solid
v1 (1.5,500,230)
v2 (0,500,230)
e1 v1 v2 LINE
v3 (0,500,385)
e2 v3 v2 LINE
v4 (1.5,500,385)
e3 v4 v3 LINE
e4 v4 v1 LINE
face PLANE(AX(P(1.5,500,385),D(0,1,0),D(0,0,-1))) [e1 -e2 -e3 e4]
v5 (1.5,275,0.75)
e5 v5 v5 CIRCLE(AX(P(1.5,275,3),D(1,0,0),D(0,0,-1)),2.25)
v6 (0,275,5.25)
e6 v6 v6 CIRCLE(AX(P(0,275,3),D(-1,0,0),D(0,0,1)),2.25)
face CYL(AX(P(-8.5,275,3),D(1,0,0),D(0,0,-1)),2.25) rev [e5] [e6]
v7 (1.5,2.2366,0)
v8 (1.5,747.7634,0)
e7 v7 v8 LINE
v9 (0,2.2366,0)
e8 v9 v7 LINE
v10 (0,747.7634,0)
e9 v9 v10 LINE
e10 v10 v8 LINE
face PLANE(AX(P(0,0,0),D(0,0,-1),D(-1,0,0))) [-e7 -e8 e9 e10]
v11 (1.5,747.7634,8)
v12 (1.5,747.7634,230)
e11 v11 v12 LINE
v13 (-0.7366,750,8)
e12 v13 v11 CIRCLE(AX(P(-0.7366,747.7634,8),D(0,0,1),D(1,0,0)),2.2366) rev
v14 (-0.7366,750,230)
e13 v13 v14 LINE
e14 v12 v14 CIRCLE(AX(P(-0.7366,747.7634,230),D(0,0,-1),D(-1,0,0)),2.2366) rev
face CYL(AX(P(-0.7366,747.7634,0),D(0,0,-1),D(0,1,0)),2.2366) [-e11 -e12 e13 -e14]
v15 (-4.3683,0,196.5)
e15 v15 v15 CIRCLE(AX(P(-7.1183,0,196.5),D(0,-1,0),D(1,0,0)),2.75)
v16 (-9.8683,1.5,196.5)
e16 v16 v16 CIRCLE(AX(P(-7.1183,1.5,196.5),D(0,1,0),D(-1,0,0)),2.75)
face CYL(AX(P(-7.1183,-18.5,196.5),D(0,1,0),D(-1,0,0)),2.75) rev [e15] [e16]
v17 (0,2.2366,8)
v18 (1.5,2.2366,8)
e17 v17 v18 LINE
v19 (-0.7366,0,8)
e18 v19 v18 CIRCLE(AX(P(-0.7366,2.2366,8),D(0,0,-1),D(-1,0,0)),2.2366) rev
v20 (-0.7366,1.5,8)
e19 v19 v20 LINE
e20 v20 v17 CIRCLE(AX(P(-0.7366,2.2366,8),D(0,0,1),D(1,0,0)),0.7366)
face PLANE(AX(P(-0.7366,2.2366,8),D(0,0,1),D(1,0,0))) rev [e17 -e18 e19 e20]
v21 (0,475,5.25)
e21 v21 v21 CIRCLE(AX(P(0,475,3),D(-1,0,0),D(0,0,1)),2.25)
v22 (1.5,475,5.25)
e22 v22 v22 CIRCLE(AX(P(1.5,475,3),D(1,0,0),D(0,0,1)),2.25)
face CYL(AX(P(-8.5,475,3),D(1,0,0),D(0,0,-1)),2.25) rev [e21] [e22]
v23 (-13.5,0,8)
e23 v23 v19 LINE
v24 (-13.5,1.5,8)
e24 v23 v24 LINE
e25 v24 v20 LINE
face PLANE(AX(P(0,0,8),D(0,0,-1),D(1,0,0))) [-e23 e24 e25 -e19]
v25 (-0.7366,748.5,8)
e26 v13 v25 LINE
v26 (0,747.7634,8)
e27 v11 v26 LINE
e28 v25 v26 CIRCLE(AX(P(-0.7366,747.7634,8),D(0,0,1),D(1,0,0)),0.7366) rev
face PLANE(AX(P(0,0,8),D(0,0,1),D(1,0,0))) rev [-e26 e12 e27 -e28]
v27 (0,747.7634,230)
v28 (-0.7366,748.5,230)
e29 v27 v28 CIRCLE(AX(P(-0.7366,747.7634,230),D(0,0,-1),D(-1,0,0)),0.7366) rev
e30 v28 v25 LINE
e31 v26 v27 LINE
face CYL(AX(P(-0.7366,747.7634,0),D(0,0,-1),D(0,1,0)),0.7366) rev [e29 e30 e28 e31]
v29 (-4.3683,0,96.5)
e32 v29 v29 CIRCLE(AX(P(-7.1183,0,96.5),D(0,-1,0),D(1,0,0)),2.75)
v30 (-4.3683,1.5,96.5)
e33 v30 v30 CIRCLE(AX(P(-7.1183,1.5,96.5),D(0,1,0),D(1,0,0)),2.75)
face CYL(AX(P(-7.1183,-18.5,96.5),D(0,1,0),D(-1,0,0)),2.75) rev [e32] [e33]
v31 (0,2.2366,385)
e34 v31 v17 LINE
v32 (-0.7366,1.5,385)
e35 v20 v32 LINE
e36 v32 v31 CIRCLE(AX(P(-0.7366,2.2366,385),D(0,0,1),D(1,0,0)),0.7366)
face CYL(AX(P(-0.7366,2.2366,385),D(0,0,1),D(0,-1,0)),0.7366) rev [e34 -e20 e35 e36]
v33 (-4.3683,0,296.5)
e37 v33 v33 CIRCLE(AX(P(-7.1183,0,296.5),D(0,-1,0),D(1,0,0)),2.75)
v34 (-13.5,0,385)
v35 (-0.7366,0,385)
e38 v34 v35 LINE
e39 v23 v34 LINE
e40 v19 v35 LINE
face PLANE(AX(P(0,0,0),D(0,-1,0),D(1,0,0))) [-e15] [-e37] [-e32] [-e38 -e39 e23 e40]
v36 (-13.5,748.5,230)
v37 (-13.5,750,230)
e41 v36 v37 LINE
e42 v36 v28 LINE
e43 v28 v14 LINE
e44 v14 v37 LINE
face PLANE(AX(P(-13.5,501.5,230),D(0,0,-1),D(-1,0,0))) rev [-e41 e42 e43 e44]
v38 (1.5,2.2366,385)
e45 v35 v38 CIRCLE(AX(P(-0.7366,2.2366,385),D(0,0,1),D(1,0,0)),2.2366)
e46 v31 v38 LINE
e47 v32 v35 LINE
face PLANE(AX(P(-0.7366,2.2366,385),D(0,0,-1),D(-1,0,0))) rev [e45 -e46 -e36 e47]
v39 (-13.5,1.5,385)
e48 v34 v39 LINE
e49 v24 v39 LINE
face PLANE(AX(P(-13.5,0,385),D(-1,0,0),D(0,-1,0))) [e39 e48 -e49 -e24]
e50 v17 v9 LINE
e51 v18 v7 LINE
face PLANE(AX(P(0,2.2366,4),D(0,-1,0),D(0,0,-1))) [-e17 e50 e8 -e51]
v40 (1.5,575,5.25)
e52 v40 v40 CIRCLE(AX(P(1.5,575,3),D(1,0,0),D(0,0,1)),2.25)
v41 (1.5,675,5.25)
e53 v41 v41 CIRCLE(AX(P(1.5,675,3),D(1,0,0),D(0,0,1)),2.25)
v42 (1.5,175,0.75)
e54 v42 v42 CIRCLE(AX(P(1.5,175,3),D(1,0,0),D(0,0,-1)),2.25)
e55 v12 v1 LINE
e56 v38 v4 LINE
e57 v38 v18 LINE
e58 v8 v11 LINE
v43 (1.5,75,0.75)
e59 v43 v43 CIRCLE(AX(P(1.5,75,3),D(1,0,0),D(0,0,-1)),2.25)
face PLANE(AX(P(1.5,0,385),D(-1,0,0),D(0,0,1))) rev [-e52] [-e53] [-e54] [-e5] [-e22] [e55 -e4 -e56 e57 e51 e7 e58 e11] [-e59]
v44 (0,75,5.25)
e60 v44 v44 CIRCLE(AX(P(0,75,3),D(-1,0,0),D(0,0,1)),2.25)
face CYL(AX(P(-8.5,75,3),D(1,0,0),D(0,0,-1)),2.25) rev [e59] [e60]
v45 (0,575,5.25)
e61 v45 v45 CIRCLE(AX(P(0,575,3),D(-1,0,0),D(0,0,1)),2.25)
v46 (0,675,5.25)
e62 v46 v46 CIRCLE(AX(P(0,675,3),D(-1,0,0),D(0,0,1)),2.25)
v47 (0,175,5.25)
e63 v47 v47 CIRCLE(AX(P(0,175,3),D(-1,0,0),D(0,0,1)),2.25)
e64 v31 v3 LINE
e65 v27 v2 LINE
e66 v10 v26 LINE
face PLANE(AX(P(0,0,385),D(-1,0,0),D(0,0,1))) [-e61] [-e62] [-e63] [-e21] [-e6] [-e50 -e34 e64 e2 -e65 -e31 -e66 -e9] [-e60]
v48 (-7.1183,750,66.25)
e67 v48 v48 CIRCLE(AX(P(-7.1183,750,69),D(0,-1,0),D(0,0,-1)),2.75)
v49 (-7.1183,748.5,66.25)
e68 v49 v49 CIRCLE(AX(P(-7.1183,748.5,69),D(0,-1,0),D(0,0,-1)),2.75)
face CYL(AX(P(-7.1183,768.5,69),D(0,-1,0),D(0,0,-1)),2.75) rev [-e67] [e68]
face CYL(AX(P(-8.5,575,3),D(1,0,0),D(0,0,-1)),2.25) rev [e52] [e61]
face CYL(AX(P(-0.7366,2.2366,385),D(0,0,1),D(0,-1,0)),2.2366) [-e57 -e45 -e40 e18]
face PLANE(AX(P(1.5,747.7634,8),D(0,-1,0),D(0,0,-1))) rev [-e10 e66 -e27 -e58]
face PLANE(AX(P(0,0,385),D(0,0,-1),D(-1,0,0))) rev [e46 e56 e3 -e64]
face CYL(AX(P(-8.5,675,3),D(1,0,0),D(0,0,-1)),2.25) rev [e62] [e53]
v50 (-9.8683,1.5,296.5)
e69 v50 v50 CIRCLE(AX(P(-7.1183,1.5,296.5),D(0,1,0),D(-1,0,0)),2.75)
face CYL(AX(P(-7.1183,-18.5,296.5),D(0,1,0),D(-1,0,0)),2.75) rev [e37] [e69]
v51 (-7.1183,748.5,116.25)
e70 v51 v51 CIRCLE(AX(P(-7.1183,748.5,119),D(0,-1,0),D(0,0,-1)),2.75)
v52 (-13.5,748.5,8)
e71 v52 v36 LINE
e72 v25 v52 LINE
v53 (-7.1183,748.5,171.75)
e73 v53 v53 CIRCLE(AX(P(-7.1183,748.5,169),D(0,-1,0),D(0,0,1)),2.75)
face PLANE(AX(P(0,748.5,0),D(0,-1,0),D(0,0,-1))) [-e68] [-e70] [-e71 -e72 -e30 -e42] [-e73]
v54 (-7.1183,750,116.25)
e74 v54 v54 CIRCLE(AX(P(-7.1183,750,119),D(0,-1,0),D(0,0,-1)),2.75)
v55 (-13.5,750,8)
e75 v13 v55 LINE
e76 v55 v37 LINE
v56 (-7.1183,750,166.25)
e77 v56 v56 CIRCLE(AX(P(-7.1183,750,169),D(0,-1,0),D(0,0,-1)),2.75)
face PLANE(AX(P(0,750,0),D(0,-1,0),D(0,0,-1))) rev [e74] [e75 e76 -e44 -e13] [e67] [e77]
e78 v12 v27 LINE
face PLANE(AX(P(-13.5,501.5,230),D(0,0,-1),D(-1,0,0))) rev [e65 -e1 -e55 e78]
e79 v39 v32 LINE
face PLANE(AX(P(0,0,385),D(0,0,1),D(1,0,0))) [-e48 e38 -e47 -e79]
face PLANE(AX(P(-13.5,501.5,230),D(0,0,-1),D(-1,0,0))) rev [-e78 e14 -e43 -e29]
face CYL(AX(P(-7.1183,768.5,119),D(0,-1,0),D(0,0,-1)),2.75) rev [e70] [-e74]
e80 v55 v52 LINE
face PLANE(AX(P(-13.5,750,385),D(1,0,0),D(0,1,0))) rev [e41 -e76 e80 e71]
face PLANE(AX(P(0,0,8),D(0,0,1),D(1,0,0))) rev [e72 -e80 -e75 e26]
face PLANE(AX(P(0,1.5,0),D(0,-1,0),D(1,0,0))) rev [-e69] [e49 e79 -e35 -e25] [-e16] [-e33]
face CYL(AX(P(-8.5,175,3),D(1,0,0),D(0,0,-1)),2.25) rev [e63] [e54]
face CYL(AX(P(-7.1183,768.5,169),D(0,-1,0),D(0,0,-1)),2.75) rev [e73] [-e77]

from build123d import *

# Parameters (mm, degrees)
SKETCH_1_W                       = 1.5
SKETCH_1_H                       = 750
SM_BASE_FLANGE_1_DEPTH           = 385
SM_EDGE_FLANGE_1_STRIP_W         = 7.4732
SM_EDGE_FLANGE_1_STRIP_H         = 1.5
SM_EDGE_FLANGE_1_STRIP_CUT_DEPTH = 385
SM_EDGE_FLANGE_1_DEPTH           = 385
SM_EDGE_FLANGE_2_STRIP_W         = 7.4732
SM_EDGE_FLANGE_2_STRIP_H         = 1.5
SM_EDGE_FLANGE_2_STRIP_CUT_DEPTH = 385
SM_EDGE_FLANGE_2_DEPTH           = 385
SKETCH_12_W                      = 17.104155355
SKETCH_12_H                      = 8.497904819
CUT_EXTRUDE_1_DEPTH              = 8
CUT_EXTRUDE_START                = -8
CUT_EXTRUDE_3_DEPTH              = 8
SKETCH_16_W                      = 51.042433358
SKETCH_16_H                      = 155
CUT_EXTRUDE_4_DEPTH              = 248.5
SKETCH_17_R                      = 2.75
CUT_EXTRUDE_5_DEPTH              = 20
SKETCH_18_R                      = 2.75
CUT_EXTRUDE_6_DEPTH              = 20
SKETCH_19_W                      = 1.5
SKETCH_19_H                      = 155
CUT_EXTRUDE_7_DEPTH              = 1.5
SKETCH_21_R                      = 2.25
CUT_EXTRUDE_9_DEPTH              = 10


# Read off the part's stored shape, not the designer's step: 切除-拉伸3
# Sheet-metal steps are written as plain solids
with BuildPart() as part:
    # Sketch 1 → 基体-法兰1 (new body)
    with BuildSketch(Plane.XY):
        with Locations((0.75, 375)):
            Rectangle(SKETCH_1_W, SKETCH_1_H)
    extrude(amount=SM_BASE_FLANGE_1_DEPTH)

    # 边线-法兰1 strip (across the edge) → 边线-法兰1 strip cut (cut)
    with BuildSketch(Plane(origin=(0, 750, 385), x_dir=(0, -1, 0), z_dir=(0, 0, -1))):
        with Locations((-1.5, -0.75)):
            Rectangle(SM_EDGE_FLANGE_1_STRIP_W, SM_EDGE_FLANGE_1_STRIP_H)
    extrude(amount=SM_EDGE_FLANGE_1_STRIP_CUT_DEPTH, mode=Mode.SUBTRACT)

    # 边线-法兰1 section (across the edge) → 边线-法兰1 (add)
    with BuildSketch(Plane(origin=(0, 750, 385), x_dir=(0, -1, 0), z_dir=(0, 0, -1))):
        with BuildLine():
            Line((0, 0.7366), (0, 13.5))
            Line((0, 13.5), (1.5, 13.5))
            Line((1.5, 13.5), (1.5, 0.7366))
            ThreePointArc((1.5, 0.7366), (1.715745145, 0.215745145), (2.2366, 0))
            Line((2.2366, 0), (2.2366, -1.5))
            ThreePointArc((2.2366, -1.5), (0.655084973, -0.844915027), (0, 0.7366))
        make_face()
    extrude(amount=SM_EDGE_FLANGE_1_DEPTH)

    # 边线-法兰2 strip (across the edge) → 边线-法兰2 strip cut (cut)
    with BuildSketch(Plane(origin=(0, 0, 0), x_dir=(0, 1, 0), z_dir=(0, 0, 1))):
        with Locations((-1.5, -0.75)):
            Rectangle(SM_EDGE_FLANGE_2_STRIP_W, SM_EDGE_FLANGE_2_STRIP_H)
    extrude(amount=SM_EDGE_FLANGE_2_STRIP_CUT_DEPTH, mode=Mode.SUBTRACT)

    # 边线-法兰2 section (across the edge) → 边线-法兰2 (add)
    with BuildSketch(Plane(origin=(0, 0, 0), x_dir=(0, 1, 0), z_dir=(0, 0, 1))):
        with BuildLine():
            Line((0, 0.7366), (0, 13.5))
            Line((0, 13.5), (1.5, 13.5))
            Line((1.5, 13.5), (1.5, 0.7366))
            ThreePointArc((1.5, 0.7366), (1.715745145, 0.215745145), (2.2366, 0))
            Line((2.2366, 0), (2.2366, -1.5))
            ThreePointArc((2.2366, -1.5), (0.655084973, -0.844915027), (0, 0.7366))
        make_face()
    extrude(amount=SM_EDGE_FLANGE_2_DEPTH)

    # 草图12 → 切除-拉伸1 (cut)
    with BuildSketch(Plane(origin=(0, 0, 0), x_dir=(-1, 0, 0), z_dir=(0, 0, -1))):
        with Locations((7.052077678, 752.01235241)):
            Rectangle(SKETCH_12_W, SKETCH_12_H)
    extrude(amount=-CUT_EXTRUDE_1_DEPTH, mode=Mode.SUBTRACT)

    # 切除-拉伸3 outline → 切除-拉伸3 (cut)
    with BuildSketch(Plane(origin=(0, 0, 0), x_dir=(-1, 0, 0), z_dir=(0, 0, -1)).offset(CUT_EXTRUDE_START)):
        with BuildLine():
            Line((0, 2.2366), (-1.5, 2.2366))
            ThreePointArc((-1.5, 2.2366), (-0.844915027, 0.655084973), (0.7366, 0))
            Line((0.7366, 0), (13.5, 0))
            Line((13.5, 0), (13.5, 1.5))
            Line((13.5, 1.5), (0.7366, 1.5))
            ThreePointArc((0.7366, 1.5), (0.215745145, 1.715745145), (0, 2.2366))
        make_face()
    extrude(amount=CUT_EXTRUDE_3_DEPTH, mode=Mode.SUBTRACT)

    # 草图16 → 切除-拉伸4 (cut)
    with BuildSketch(Plane(origin=(0, 750, 0), x_dir=(1, 0, 0), z_dir=(0, 1, 0))):
        with Locations((12.021216679, -307.5)):
            Rectangle(SKETCH_16_W, SKETCH_16_H)
    extrude(amount=-CUT_EXTRUDE_4_DEPTH, mode=Mode.SUBTRACT)

    # 草图17 → 切除-拉伸5 (cut)
    with BuildSketch(Plane(origin=(0, 1.5, 0), x_dir=(1, 0, 0), z_dir=(0, 1, 0))):
        with Locations(Location((-7.1183, -296.5, 0), (0, 0, 180))):
            Circle(SKETCH_17_R)
        with Locations(Location((-7.1183, -196.5, 0), (0, 0, 180))):
            Circle(SKETCH_17_R)
        with Locations((-7.1183, -96.5)):
            Circle(SKETCH_17_R)
    extrude(amount=-CUT_EXTRUDE_5_DEPTH, mode=Mode.SUBTRACT)

    # 草图18 → 切除-拉伸6 (cut)
    with BuildSketch(Plane.XZ.offset(-748.5)):
        with Locations(Location((-7.1183, 69, 0), (0, 0, 270))):
            Circle(SKETCH_18_R)
        with Locations(Location((-7.1183, 119, 0), (0, 0, 270))):
            Circle(SKETCH_18_R)
        with Locations(Location((-7.1183, 169, 0), (0, 0, 270))):
            Circle(SKETCH_18_R)
    extrude(amount=-CUT_EXTRUDE_6_DEPTH, mode=Mode.SUBTRACT)

    # 草图19 → 切除-拉伸7 (cut)
    with BuildSketch(Plane(origin=(0, 501.5, 0), x_dir=(1, 0, 0), z_dir=(0, 1, 0))):
        with Locations((0.75, -307.5)):
            Rectangle(SKETCH_19_W, SKETCH_19_H)
    extrude(amount=-CUT_EXTRUDE_7_DEPTH, mode=Mode.SUBTRACT)

    # 草图21 → 切除-拉伸9 (cut)
    with BuildSketch(Plane(origin=(1.5, 0, 0), x_dir=(0, 0, -1), z_dir=(1, 0, 0))):
        with Locations((-3, 75)):
            Circle(SKETCH_21_R)
        with Locations((-3, 175)):
            Circle(SKETCH_21_R)
        with Locations((-3, 275)):
            Circle(SKETCH_21_R)
        with Locations(Location((-3, 475, 0), (0, 0, 180))):
            Circle(SKETCH_21_R)
        with Locations(Location((-3, 575, 0), (0, 0, 180))):
            Circle(SKETCH_21_R)
        with Locations(Location((-3, 675, 0), (0, 0, 180))):
            Circle(SKETCH_21_R)
    extrude(amount=-CUT_EXTRUDE_9_DEPTH, mode=Mode.SUBTRACT)


solid = part.part
